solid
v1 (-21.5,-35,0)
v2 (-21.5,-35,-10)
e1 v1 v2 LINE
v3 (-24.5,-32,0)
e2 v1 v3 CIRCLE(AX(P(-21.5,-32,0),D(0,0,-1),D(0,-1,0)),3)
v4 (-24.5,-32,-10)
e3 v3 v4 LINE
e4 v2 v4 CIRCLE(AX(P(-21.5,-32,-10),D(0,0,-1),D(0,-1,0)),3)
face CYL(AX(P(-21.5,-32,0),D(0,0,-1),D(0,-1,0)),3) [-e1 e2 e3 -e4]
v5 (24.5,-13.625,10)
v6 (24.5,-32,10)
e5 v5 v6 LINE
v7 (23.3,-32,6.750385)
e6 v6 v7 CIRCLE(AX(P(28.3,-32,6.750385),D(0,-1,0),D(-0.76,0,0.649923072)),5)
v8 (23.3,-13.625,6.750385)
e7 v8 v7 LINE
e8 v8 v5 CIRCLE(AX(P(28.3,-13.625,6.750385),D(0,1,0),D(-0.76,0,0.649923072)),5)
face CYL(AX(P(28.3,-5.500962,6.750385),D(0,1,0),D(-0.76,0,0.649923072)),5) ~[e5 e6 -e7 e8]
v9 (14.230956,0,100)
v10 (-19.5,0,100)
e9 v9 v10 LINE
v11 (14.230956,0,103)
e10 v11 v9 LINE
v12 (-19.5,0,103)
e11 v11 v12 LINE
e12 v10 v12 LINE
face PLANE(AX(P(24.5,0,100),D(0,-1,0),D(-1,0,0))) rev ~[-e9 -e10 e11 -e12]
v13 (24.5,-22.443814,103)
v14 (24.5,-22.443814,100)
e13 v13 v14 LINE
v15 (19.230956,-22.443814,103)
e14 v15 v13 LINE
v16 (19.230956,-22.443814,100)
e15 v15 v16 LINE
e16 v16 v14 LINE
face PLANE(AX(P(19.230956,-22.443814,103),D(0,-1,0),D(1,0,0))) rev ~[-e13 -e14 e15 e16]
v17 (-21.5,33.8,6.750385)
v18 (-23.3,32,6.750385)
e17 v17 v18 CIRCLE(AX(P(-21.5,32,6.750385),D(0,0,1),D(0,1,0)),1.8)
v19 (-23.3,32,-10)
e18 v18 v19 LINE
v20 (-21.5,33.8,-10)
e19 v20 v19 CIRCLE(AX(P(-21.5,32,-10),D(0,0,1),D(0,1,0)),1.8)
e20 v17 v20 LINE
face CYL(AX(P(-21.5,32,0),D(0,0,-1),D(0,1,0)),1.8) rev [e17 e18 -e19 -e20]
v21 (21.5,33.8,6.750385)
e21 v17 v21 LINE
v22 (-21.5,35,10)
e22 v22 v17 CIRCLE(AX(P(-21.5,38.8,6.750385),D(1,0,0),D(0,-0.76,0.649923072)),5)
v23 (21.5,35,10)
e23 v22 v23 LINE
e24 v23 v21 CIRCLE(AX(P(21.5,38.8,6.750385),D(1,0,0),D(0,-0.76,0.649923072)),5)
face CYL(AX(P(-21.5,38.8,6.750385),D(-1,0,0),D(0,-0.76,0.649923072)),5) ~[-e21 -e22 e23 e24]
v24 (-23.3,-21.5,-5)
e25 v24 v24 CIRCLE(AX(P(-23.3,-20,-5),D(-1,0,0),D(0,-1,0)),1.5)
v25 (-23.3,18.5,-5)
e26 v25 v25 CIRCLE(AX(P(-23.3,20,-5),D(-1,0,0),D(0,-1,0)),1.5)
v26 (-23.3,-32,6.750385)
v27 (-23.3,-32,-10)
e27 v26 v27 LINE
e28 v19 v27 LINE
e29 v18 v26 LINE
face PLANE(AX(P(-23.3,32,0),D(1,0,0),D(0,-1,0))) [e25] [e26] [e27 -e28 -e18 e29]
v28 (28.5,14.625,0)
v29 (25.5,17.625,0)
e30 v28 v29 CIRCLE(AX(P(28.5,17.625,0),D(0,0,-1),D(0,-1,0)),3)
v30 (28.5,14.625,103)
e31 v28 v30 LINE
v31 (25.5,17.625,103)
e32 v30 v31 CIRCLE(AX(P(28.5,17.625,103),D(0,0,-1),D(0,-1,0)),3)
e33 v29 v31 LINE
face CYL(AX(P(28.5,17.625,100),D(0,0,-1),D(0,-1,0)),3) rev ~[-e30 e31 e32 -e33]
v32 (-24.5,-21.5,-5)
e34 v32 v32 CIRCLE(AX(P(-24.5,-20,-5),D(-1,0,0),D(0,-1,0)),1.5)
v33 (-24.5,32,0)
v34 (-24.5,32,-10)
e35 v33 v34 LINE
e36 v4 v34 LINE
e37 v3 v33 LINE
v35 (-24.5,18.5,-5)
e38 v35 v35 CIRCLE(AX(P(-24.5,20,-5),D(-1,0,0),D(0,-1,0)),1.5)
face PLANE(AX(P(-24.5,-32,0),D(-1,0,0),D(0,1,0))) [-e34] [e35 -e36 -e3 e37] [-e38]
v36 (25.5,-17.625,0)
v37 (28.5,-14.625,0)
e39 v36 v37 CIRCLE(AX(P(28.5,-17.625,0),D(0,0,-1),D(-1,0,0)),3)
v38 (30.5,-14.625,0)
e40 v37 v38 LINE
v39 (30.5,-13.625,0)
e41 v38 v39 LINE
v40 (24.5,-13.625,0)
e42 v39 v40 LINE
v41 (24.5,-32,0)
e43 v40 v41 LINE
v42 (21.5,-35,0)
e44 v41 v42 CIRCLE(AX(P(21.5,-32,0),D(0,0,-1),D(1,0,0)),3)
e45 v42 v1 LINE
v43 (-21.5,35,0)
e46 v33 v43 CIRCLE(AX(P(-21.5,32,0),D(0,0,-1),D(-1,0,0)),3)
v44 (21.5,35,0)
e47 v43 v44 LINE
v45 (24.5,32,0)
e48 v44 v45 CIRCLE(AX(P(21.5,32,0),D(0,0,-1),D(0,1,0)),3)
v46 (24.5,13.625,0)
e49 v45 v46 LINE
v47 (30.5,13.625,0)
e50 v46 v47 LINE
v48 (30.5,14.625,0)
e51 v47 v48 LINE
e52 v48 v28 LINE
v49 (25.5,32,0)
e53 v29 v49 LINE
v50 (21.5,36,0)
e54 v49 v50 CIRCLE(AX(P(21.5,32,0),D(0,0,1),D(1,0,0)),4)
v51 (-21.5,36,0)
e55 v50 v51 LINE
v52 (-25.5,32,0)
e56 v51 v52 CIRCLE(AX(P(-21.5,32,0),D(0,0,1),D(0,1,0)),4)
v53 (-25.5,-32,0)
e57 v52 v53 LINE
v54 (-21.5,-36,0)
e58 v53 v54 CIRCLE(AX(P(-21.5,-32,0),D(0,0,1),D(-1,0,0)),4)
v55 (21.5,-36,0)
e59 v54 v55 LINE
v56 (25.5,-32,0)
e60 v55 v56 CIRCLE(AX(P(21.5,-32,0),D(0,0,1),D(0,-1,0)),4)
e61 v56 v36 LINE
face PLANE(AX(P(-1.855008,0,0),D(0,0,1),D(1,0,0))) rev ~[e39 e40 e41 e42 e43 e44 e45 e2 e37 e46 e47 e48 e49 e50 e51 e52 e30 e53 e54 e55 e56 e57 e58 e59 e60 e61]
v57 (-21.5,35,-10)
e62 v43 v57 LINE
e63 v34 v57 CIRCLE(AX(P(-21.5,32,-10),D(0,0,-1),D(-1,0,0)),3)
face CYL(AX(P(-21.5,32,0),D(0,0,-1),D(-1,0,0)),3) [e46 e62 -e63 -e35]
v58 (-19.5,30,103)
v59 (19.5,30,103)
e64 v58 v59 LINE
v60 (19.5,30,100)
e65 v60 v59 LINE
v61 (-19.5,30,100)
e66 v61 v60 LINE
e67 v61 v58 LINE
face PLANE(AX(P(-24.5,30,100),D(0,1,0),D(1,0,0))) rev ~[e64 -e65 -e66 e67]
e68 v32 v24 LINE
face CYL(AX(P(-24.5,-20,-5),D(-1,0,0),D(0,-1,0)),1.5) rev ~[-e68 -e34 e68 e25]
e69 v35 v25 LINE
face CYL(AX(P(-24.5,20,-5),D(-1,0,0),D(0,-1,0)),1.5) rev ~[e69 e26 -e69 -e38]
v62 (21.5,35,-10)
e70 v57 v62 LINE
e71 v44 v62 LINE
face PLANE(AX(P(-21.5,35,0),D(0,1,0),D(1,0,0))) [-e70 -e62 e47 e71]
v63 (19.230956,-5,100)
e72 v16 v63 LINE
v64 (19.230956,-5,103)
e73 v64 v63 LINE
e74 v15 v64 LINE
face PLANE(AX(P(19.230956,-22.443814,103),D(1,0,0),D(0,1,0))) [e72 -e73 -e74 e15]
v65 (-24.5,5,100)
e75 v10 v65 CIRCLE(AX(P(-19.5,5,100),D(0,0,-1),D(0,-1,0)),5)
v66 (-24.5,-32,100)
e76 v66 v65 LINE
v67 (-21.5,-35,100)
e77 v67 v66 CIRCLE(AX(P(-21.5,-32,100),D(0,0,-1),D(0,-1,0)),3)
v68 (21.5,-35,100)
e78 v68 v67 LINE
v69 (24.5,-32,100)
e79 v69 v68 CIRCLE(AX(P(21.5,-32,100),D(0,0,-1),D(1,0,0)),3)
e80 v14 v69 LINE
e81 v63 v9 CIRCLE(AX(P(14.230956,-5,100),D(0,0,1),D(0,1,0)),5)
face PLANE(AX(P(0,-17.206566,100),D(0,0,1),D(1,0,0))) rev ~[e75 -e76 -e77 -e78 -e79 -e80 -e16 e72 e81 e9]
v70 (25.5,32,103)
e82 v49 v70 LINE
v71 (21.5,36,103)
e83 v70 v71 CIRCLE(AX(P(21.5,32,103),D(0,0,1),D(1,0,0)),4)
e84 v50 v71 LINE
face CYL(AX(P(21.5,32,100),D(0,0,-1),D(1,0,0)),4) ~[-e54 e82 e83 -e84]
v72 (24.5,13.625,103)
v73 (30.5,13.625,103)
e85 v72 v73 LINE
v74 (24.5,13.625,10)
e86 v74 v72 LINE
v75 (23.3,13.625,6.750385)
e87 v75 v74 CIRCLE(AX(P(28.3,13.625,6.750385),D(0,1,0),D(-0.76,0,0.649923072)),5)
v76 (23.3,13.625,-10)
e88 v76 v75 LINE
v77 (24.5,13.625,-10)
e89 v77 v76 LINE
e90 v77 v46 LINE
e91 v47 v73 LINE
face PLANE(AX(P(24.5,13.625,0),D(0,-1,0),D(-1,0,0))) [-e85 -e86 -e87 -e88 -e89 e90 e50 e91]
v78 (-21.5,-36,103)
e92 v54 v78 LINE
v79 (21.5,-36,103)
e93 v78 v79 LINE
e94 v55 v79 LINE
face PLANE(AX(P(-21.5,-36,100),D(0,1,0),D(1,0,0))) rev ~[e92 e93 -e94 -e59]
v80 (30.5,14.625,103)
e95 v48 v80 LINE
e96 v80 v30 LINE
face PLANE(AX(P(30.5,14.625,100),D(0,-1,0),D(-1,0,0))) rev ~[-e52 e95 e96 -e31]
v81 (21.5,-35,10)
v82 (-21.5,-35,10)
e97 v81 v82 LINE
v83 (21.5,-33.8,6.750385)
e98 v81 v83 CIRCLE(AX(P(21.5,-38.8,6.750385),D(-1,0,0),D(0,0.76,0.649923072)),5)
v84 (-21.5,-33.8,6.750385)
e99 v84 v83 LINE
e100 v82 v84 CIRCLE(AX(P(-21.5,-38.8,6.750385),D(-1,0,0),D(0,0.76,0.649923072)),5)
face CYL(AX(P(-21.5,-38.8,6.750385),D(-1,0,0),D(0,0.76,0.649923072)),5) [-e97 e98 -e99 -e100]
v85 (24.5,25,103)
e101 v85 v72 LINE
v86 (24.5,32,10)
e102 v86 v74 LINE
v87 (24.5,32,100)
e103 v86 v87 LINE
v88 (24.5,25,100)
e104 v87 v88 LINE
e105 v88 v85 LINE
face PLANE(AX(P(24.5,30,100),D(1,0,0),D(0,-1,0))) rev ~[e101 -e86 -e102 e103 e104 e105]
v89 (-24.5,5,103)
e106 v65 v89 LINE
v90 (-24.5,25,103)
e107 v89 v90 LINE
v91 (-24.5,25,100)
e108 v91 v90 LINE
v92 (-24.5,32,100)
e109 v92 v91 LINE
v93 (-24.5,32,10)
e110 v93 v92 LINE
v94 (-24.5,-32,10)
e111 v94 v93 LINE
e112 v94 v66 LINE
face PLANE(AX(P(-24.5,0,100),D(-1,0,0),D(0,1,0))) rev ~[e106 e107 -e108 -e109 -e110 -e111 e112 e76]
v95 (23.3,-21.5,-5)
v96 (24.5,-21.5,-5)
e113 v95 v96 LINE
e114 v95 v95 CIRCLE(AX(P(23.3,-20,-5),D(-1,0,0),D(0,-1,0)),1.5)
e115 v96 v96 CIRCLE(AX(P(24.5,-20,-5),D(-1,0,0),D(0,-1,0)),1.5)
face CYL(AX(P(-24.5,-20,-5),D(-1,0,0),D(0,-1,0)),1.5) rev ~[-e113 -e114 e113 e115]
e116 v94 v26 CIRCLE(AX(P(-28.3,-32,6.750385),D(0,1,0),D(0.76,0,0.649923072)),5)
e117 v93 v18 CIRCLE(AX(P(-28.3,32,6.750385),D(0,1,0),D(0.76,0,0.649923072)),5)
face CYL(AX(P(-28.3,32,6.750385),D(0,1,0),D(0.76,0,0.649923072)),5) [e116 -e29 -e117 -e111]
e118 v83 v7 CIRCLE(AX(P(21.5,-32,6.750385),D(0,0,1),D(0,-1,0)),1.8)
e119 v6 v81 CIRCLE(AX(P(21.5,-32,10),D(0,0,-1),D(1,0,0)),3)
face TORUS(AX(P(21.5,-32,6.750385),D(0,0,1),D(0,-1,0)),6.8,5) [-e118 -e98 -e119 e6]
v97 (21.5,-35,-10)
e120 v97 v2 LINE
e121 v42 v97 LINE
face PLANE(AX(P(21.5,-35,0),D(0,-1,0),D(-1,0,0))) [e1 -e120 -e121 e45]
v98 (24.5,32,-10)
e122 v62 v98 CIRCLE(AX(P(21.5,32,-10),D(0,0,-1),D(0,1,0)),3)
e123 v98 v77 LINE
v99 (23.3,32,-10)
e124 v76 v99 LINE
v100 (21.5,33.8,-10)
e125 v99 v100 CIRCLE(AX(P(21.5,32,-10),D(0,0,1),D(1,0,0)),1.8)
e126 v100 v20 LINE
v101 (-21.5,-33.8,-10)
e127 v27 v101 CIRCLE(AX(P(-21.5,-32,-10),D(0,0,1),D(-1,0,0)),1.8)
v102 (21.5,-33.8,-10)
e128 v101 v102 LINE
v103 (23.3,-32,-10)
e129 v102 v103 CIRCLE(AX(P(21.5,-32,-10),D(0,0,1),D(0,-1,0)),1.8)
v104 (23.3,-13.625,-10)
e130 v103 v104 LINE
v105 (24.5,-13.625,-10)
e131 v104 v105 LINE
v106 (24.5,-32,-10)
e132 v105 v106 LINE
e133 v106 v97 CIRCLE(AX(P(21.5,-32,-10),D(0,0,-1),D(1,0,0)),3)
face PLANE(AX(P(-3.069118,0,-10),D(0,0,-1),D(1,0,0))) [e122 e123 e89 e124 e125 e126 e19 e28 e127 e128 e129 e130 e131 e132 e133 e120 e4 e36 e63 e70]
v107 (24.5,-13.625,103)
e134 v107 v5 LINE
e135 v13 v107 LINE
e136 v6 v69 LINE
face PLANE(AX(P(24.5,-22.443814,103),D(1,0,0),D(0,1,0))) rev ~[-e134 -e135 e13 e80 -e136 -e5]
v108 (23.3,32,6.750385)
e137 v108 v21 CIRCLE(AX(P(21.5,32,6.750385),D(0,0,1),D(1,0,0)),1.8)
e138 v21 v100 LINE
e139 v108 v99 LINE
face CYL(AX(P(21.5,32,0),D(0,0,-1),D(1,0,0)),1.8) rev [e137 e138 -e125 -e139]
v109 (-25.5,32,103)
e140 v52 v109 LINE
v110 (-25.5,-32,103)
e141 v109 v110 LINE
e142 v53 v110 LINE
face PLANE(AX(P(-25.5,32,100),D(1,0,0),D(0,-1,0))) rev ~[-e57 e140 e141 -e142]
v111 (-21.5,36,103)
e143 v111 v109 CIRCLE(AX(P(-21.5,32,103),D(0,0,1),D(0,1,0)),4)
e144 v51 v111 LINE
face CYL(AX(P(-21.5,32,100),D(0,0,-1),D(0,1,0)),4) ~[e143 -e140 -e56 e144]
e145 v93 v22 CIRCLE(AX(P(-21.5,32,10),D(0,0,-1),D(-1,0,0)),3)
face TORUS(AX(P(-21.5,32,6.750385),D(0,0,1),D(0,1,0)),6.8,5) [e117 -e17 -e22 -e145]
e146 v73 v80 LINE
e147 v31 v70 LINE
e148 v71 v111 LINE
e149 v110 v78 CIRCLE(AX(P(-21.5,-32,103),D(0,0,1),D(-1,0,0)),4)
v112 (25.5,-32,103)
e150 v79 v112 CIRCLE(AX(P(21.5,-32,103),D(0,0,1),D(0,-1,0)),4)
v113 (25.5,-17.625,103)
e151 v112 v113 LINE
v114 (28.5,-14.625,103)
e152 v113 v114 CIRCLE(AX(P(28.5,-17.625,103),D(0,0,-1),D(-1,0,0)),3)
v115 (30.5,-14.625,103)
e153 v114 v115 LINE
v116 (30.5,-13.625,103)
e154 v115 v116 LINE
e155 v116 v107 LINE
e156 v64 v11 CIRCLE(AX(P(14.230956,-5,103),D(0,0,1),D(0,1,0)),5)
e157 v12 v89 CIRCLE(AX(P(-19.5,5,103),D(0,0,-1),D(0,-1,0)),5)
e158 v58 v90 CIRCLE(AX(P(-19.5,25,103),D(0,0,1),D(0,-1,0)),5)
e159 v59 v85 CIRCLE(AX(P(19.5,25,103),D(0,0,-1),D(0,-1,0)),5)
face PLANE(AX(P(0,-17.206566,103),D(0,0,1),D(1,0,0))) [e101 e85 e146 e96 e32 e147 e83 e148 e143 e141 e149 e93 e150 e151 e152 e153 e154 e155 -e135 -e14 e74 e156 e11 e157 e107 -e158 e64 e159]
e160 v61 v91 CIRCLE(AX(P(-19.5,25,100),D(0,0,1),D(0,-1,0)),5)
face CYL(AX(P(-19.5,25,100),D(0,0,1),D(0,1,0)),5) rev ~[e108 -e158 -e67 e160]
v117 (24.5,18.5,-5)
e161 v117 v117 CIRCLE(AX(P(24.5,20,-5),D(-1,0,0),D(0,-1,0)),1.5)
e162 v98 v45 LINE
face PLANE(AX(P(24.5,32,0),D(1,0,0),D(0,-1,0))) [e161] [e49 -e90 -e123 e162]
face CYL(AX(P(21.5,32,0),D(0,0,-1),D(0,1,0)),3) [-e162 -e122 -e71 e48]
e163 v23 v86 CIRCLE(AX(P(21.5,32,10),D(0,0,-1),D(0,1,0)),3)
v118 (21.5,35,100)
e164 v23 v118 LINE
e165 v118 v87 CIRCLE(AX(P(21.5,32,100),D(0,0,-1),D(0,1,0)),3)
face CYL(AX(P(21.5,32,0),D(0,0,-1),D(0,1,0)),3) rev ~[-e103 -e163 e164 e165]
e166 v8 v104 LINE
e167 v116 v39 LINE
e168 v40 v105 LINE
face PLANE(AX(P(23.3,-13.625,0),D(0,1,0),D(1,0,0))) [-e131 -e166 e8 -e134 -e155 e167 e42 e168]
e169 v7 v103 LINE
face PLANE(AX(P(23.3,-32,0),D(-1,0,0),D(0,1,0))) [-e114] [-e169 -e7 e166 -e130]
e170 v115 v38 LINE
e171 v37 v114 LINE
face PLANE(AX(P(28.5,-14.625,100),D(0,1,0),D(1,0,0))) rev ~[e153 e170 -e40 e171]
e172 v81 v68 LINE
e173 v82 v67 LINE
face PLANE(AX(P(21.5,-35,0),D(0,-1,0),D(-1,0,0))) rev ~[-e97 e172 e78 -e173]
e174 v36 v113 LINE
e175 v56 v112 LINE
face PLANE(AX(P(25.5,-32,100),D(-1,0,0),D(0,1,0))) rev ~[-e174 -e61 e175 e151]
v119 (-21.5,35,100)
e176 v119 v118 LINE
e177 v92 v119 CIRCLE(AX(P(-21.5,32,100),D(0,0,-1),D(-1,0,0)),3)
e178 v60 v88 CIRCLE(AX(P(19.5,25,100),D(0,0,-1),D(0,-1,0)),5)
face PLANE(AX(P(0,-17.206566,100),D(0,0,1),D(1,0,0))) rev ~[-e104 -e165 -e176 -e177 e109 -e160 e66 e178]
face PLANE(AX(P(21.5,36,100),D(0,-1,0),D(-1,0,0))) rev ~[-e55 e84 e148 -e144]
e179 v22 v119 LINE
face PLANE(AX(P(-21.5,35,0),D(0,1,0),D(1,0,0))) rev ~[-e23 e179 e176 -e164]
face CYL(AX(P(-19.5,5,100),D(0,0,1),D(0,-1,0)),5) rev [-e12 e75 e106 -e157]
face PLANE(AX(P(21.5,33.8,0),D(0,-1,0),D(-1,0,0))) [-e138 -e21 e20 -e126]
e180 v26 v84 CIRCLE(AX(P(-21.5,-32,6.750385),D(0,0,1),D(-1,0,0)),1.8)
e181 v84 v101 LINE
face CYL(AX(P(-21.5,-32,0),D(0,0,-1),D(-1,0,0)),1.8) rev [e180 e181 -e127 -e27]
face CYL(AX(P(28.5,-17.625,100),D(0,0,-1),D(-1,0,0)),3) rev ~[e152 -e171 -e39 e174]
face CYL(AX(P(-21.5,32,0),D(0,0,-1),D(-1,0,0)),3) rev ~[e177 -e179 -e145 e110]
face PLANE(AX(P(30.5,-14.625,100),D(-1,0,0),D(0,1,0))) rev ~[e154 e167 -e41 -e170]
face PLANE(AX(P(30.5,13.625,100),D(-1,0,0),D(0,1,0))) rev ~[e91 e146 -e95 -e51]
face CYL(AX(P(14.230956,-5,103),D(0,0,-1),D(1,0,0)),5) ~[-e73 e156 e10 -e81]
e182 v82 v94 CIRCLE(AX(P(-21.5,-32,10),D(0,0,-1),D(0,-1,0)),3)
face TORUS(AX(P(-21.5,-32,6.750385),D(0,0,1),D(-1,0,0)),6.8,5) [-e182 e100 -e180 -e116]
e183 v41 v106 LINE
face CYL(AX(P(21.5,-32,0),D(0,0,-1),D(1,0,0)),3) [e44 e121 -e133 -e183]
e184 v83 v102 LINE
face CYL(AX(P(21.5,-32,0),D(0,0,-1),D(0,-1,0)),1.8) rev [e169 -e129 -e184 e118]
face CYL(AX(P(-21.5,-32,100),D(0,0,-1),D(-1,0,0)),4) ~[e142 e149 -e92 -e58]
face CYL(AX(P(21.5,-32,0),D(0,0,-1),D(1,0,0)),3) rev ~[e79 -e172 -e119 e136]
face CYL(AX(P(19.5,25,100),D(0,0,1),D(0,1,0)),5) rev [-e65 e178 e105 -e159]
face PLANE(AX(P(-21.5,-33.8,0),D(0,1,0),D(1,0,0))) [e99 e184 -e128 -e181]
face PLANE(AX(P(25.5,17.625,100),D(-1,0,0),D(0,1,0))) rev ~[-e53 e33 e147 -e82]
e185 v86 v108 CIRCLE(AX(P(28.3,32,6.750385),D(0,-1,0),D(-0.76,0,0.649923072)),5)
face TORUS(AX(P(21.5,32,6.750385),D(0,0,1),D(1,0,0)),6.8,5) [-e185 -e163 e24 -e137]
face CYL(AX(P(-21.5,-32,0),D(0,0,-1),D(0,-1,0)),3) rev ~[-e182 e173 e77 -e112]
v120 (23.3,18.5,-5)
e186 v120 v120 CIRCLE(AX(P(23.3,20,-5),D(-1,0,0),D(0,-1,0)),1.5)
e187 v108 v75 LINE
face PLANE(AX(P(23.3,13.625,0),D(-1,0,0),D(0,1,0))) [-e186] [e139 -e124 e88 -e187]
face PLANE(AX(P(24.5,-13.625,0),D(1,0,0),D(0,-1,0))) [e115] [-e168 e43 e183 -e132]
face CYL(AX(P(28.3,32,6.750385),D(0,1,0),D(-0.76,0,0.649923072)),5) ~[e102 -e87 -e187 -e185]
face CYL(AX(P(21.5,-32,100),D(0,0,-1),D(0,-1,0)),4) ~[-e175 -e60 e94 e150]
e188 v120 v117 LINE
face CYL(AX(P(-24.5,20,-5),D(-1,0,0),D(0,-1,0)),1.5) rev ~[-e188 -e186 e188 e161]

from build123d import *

# Parameters (mm, degrees)
F1_DEPTH     = 100
F3_DEPTH     = 3
F5_DEPTH     = 10
F6_R         = 1.5
F7_DEPTH     = 55.001
F8_T1_DEPTH  = 26.4990384046
F8_T3_DEPTH  = 43
F8_T5_DEPTH  = 64
F8_T7_DEPTH  = 26.4990384046
F8_T10_ANGLE = 90
F8_T12_ANGLE = 90
F8_T14_ANGLE = 90
F8_T16_ANGLE = 90
F9_W         = 5.2690437883
F9_H         = 22.4438142031
F10_DEPTH    = 25
F11_DEPTH    = 22.3
F12_R        = 5


# Not quite as in the source:
# - a fillet or chamfer that OpenCascade refuses, or shapes differently, is made with other operations: its cross-section is extruded or revolved along the edge and cut away or added
# - two fillets or chamfers of one size are made in one step


with BuildPart() as f1:
    # F0 (on Top) → F1 (new body)
    with BuildSketch(Plane.XY):
        with BuildLine():
            Line((-21.5, 35), (21.5, 35))
            ThreePointArc((21.5, 35), (23.6213203436, 34.1213203436), (24.5, 32))
            Line((24.5, 32), (24.5, 13.625))
            Line((24.5, 13.625), (30.5, 13.625))
            Line((30.5, 13.625), (30.5, 14.625))
            Line((30.5, 14.625), (28.5, 14.625))
            ThreePointArc((28.5, 14.625), (26.3786796564, 15.5036796564), (25.5, 17.625))
            Line((25.5, 17.625), (25.5, 32))
            ThreePointArc((25.5, 32), (24.3284271247, 34.8284271247), (21.5, 36))
            Line((21.5, 36), (-21.5, 36))
            ThreePointArc((-21.5, 36), (-24.3284271247, 34.8284271247), (-25.5, 32))
            Line((-25.5, 32), (-25.5, -32))
            ThreePointArc((-25.5, -32), (-24.3284271247, -34.8284271247), (-21.5, -36))
            Line((-21.5, -36), (21.5, -36))
            ThreePointArc((21.5, -36), (24.3284271247, -34.8284271247), (25.5, -32))
            Line((25.5, -32), (25.5, -17.625))
            ThreePointArc((25.5, -17.625), (26.3786796564, -15.5036796564), (28.5, -14.625))
            Line((28.5, -14.625), (30.5, -14.625))
            Line((30.5, -14.625), (30.5, -13.625))
            Line((30.5, -13.625), (24.5, -13.625))
            Line((24.5, -13.625), (24.5, -32))
            ThreePointArc((24.5, -32), (23.6213203436, -34.1213203436), (21.5, -35))
            Line((21.5, -35), (-21.5, -35))
            ThreePointArc((-21.5, -35), (-23.6213203436, -34.1213203436), (-24.5, -32))
            Line((-24.5, -32), (-24.5, 32))
            ThreePointArc((-24.5, 32), (-23.6213203436, 34.1213203436), (-21.5, 35))
        make_face()
    extrude(amount=F1_DEPTH)

    # F2 (on face) → F3 (join)
    with BuildSketch(Plane.XY.offset(100)):
        with BuildLine():
            Line((24.5, -32), (24.5, -13.625))
            Line((24.5, -13.625), (24.5, 0))
            Line((24.5, 0), (-24.5, 0))
            Line((-24.5, 0), (-24.5, -32))
            ThreePointArc((-24.5, -32), (-23.6213203436, -34.1213203436), (-21.5, -35))
            Line((-21.5, -35), (21.5, -35))
            ThreePointArc((21.5, -35), (23.6213203436, -34.1213203436), (24.5, -32))
        make_face()
        with BuildLine():
            Line((30.5, -13.625), (24.5, -13.625))
            Line((24.5, -13.625), (24.5, -32))
            ThreePointArc((24.5, -32), (23.6213203436, -34.1213203436), (21.5, -35))
            Line((21.5, -35), (-21.5, -35))
            ThreePointArc((-21.5, -35), (-23.6213203436, -34.1213203436), (-24.5, -32))
            Line((-24.5, -32), (-24.5, 0))
            Line((-24.5, 0), (-24.5, 30))
            Line((-24.5, 30), (-24.5, 32))
            ThreePointArc((-24.5, 32), (-23.6213203436, 34.1213203436), (-21.5, 35))
            Line((-21.5, 35), (21.5, 35))
            ThreePointArc((21.5, 35), (23.6213203436, 34.1213203436), (24.5, 32))
            Line((24.5, 32), (24.5, 30))
            Line((24.5, 30), (24.5, 13.625))
            Line((24.5, 13.625), (30.5, 13.625))
            Line((30.5, 13.625), (30.5, 14.625))
            Line((30.5, 14.625), (28.5, 14.625))
            ThreePointArc((28.5, 14.625), (26.3786796564, 15.5036796564), (25.5, 17.625))
            Line((25.5, 17.625), (25.5, 32))
            ThreePointArc((25.5, 32), (24.3284271247, 34.8284271247), (21.5, 36))
            Line((21.5, 36), (-21.5, 36))
            ThreePointArc((-21.5, 36), (-24.3284271247, 34.8284271247), (-25.5, 32))
            Line((-25.5, 32), (-25.5, -32))
            ThreePointArc((-25.5, -32), (-24.3284271247, -34.8284271247), (-21.5, -36))
            Line((-21.5, -36), (21.5, -36))
            ThreePointArc((21.5, -36), (24.3284271247, -34.8284271247), (25.5, -32))
            Line((25.5, -32), (25.5, -17.625))
            ThreePointArc((25.5, -17.625), (26.3786796564, -15.5036796564), (28.5, -14.625))
            Line((28.5, -14.625), (30.5, -14.625))
            Line((30.5, -14.625), (30.5, -13.625))
        make_face()
        with BuildLine():
            Line((-24.5, 32), (-24.5, 30))
            Line((-24.5, 30), (24.5, 30))
            Line((24.5, 30), (24.5, 32))
            ThreePointArc((24.5, 32), (23.6213203436, 34.1213203436), (21.5, 35))
            Line((21.5, 35), (-21.5, 35))
            ThreePointArc((-21.5, 35), (-23.6213203436, 34.1213203436), (-24.5, 32))
        make_face()
    extrude(amount=F3_DEPTH)

    # F4 (on face) → F5 (join, symmetric)
    with BuildSketch(Plane(origin=(0, 0, 0), x_dir=(1, 0, 0), z_dir=(0, 0, -1))):
        with BuildLine():
            Line((23.3, -13.625), (23.3, -32))
            ThreePointArc((23.3, -32), (22.7727922061, -33.2727922061), (21.5, -33.8))
            Line((21.5, -33.8), (-21.5, -33.8))
            ThreePointArc((-21.5, -33.8), (-22.7727922061, -33.2727922061), (-23.3, -32))
            Line((-23.3, -32), (-23.3, 32))
            ThreePointArc((-23.3, 32), (-22.7727922061, 33.2727922061), (-21.5, 33.8))
            Line((-21.5, 33.8), (21.5, 33.8))
            ThreePointArc((21.5, 33.8), (22.7727922061, 33.2727922061), (23.3, 32))
            Line((23.3, 32), (23.3, 13.625))
            Line((23.3, 13.625), (24.5, 13.625))
            Line((24.5, 13.625), (24.5, 32))
            ThreePointArc((24.5, 32), (23.6213203436, 34.1213203436), (21.5, 35))
            Line((21.5, 35), (-21.5, 35))
            ThreePointArc((-21.5, 35), (-23.6213203436, 34.1213203436), (-24.5, 32))
            Line((-24.5, 32), (-24.5, -32))
            ThreePointArc((-24.5, -32), (-23.6213203436, -34.1213203436), (-21.5, -35))
            Line((-21.5, -35), (21.5, -35))
            ThreePointArc((21.5, -35), (23.6213203436, -34.1213203436), (24.5, -32))
            Line((24.5, -32), (24.5, -13.625))
            Line((24.5, -13.625), (23.3, -13.625))
        make_face()
    extrude(amount=F5_DEPTH, both=True)

    # F6 (on face) → F7 (cut, through all)
    with BuildSketch(Plane(origin=(-24.5, 0, 0), x_dir=(0, -1, 0), z_dir=(-1, 0, 0))):
        with Locations((-20, -5)):
            Circle(F6_R)
        with Locations((20, -5)):
            Circle(F6_R)
    extrude(amount=-F7_DEPTH, mode=Mode.SUBTRACT)

    # F8: fillet of radius 5 on 1 edges, made by hand

    # F8_s2 → F8_t1 (cut)
    with BuildSketch(Plane.XZ.offset(-32)):
        with BuildLine():
            ThreePointArc((24.5, 10), (23.6095842402, 8.4824354457), (23.3, 6.7503846381))
            Line((23.3, 6.7503846381), (23.3, 10))
            Line((23.3, 10), (24.5, 10))
        make_face()
    extrude(amount=F8_T1_DEPTH, mode=Mode.SUBTRACT)

    # F8_s4 → F8_t3 (cut)
    with BuildSketch(Plane.YZ.offset(-21.5)):
        with BuildLine():
            ThreePointArc((35, 10), (34.1095842402, 8.4824354457), (33.8, 6.7503846381))
            Line((33.8, 6.7503846381), (33.8, 10))
            Line((33.8, 10), (35, 10))
        make_face()
        with BuildLine():
            ThreePointArc((-35, 10), (-34.1095842402, 8.4824354457), (-33.8, 6.7503846381))
            Line((-33.8, 6.7503846381), (-33.8, 10))
            Line((-33.8, 10), (-35, 10))
        make_face()
    extrude(amount=F8_T3_DEPTH, mode=Mode.SUBTRACT)

    # F8_s6 → F8_t5 (cut)
    with BuildSketch(Plane.XZ.offset(-32)):
        with BuildLine():
            ThreePointArc((-24.5, 10), (-23.6095842402, 8.4824354457), (-23.3, 6.7503846381))
            Line((-23.3, 6.7503846381), (-23.3, 10))
            Line((-23.3, 10), (-24.5, 10))
        make_face()
    extrude(amount=F8_T5_DEPTH, mode=Mode.SUBTRACT)

    # F8_s8 → F8_t7 (cut)
    with BuildSketch(Plane.XZ.offset(5.5009615954)):
        with BuildLine():
            ThreePointArc((24.5, 10), (23.6095842402, 8.4824354457), (23.3, 6.7503846381))
            Line((23.3, 6.7503846381), (23.3, 10))
            Line((23.3, 10), (24.5, 10))
        make_face()
    extrude(amount=F8_T7_DEPTH, mode=Mode.SUBTRACT)

    # F8_s9 → F8_t10 (revolve, cut)
    with BuildSketch(Plane.XZ.offset(-32)):
        with BuildLine():
            ThreePointArc((24.5, 10), (23.6095842402, 8.4824354457), (23.3, 6.7503846381))
            Line((23.3, 6.7503846381), (23.3, 10))
            Line((23.3, 10), (24.5, 10))
        make_face()
    revolve(axis=Axis((21.5, 32, 10), (0, 0, 1)), revolution_arc=F8_T10_ANGLE, mode=Mode.SUBTRACT)

    # F8_s11 → F8_t12 (revolve, cut)
    with BuildSketch(Plane.YZ.offset(-21.5)):
        with BuildLine():
            ThreePointArc((35, 10), (34.1095842402, 8.4824354457), (33.8, 6.7503846381))
            Line((33.8, 6.7503846381), (33.8, 10))
            Line((33.8, 10), (35, 10))
        make_face()
    revolve(axis=Axis((-21.5, 32, 10), (0, 0, 1)), revolution_arc=F8_T12_ANGLE, mode=Mode.SUBTRACT)

    # F8_s13 → F8_t14 (revolve, cut)
    with BuildSketch(Plane.XZ.offset(32)):
        with BuildLine():
            ThreePointArc((-24.5, 10), (-23.6095842402, 8.4824354457), (-23.3, 6.7503846381))
            Line((-23.3, 6.7503846381), (-23.3, 10))
            Line((-23.3, 10), (-24.5, 10))
        make_face()
    revolve(axis=Axis((-21.5, -32, 10), (0, 0, 1)), revolution_arc=F8_T14_ANGLE, mode=Mode.SUBTRACT)

    # F8_s15 → F8_t16 (revolve, cut)
    with BuildSketch(Plane.YZ.offset(21.5)):
        with BuildLine():
            ThreePointArc((-35, 10), (-34.1095842402, 8.4824354457), (-33.8, 6.7503846381))
            Line((-33.8, 6.7503846381), (-33.8, 10))
            Line((-33.8, 10), (-35, 10))
        make_face()
    revolve(axis=Axis((21.5, -32, 10), (0, 0, 1)), revolution_arc=F8_T16_ANGLE, mode=Mode.SUBTRACT)

    # F9 (on face) → F10 (cut)
    with BuildSketch(Plane.XY.offset(103)):
        with Locations((21.8654781058, -11.2219071016)):
            Rectangle(F9_W, F9_H)
    extrude(amount=-F10_DEPTH, mode=Mode.SUBTRACT)

    # F9 (on face) → F11 (cut)
    with BuildSketch(Plane.XY.offset(103)):
        Polygon((24.5, -13.625), (24.5, 0), (19.2309562117, 0), (19.2309562117, -22.4438142031), (24.5, -22.4438142031), align=None)
    extrude(amount=-F11_DEPTH, mode=Mode.SUBTRACT)

    # F12
    f12_edges = [f1.edges().sort_by_distance(p)[0] for p in [
        (-24.5, 0, 101.5),
        (19.230956, 0, 101.5),
        (-24.5, 30, 101.5),
        (24.5, 30, 101.5),
    ]]
    fillet(f12_edges, radius=F12_R)


solid = f1.part
